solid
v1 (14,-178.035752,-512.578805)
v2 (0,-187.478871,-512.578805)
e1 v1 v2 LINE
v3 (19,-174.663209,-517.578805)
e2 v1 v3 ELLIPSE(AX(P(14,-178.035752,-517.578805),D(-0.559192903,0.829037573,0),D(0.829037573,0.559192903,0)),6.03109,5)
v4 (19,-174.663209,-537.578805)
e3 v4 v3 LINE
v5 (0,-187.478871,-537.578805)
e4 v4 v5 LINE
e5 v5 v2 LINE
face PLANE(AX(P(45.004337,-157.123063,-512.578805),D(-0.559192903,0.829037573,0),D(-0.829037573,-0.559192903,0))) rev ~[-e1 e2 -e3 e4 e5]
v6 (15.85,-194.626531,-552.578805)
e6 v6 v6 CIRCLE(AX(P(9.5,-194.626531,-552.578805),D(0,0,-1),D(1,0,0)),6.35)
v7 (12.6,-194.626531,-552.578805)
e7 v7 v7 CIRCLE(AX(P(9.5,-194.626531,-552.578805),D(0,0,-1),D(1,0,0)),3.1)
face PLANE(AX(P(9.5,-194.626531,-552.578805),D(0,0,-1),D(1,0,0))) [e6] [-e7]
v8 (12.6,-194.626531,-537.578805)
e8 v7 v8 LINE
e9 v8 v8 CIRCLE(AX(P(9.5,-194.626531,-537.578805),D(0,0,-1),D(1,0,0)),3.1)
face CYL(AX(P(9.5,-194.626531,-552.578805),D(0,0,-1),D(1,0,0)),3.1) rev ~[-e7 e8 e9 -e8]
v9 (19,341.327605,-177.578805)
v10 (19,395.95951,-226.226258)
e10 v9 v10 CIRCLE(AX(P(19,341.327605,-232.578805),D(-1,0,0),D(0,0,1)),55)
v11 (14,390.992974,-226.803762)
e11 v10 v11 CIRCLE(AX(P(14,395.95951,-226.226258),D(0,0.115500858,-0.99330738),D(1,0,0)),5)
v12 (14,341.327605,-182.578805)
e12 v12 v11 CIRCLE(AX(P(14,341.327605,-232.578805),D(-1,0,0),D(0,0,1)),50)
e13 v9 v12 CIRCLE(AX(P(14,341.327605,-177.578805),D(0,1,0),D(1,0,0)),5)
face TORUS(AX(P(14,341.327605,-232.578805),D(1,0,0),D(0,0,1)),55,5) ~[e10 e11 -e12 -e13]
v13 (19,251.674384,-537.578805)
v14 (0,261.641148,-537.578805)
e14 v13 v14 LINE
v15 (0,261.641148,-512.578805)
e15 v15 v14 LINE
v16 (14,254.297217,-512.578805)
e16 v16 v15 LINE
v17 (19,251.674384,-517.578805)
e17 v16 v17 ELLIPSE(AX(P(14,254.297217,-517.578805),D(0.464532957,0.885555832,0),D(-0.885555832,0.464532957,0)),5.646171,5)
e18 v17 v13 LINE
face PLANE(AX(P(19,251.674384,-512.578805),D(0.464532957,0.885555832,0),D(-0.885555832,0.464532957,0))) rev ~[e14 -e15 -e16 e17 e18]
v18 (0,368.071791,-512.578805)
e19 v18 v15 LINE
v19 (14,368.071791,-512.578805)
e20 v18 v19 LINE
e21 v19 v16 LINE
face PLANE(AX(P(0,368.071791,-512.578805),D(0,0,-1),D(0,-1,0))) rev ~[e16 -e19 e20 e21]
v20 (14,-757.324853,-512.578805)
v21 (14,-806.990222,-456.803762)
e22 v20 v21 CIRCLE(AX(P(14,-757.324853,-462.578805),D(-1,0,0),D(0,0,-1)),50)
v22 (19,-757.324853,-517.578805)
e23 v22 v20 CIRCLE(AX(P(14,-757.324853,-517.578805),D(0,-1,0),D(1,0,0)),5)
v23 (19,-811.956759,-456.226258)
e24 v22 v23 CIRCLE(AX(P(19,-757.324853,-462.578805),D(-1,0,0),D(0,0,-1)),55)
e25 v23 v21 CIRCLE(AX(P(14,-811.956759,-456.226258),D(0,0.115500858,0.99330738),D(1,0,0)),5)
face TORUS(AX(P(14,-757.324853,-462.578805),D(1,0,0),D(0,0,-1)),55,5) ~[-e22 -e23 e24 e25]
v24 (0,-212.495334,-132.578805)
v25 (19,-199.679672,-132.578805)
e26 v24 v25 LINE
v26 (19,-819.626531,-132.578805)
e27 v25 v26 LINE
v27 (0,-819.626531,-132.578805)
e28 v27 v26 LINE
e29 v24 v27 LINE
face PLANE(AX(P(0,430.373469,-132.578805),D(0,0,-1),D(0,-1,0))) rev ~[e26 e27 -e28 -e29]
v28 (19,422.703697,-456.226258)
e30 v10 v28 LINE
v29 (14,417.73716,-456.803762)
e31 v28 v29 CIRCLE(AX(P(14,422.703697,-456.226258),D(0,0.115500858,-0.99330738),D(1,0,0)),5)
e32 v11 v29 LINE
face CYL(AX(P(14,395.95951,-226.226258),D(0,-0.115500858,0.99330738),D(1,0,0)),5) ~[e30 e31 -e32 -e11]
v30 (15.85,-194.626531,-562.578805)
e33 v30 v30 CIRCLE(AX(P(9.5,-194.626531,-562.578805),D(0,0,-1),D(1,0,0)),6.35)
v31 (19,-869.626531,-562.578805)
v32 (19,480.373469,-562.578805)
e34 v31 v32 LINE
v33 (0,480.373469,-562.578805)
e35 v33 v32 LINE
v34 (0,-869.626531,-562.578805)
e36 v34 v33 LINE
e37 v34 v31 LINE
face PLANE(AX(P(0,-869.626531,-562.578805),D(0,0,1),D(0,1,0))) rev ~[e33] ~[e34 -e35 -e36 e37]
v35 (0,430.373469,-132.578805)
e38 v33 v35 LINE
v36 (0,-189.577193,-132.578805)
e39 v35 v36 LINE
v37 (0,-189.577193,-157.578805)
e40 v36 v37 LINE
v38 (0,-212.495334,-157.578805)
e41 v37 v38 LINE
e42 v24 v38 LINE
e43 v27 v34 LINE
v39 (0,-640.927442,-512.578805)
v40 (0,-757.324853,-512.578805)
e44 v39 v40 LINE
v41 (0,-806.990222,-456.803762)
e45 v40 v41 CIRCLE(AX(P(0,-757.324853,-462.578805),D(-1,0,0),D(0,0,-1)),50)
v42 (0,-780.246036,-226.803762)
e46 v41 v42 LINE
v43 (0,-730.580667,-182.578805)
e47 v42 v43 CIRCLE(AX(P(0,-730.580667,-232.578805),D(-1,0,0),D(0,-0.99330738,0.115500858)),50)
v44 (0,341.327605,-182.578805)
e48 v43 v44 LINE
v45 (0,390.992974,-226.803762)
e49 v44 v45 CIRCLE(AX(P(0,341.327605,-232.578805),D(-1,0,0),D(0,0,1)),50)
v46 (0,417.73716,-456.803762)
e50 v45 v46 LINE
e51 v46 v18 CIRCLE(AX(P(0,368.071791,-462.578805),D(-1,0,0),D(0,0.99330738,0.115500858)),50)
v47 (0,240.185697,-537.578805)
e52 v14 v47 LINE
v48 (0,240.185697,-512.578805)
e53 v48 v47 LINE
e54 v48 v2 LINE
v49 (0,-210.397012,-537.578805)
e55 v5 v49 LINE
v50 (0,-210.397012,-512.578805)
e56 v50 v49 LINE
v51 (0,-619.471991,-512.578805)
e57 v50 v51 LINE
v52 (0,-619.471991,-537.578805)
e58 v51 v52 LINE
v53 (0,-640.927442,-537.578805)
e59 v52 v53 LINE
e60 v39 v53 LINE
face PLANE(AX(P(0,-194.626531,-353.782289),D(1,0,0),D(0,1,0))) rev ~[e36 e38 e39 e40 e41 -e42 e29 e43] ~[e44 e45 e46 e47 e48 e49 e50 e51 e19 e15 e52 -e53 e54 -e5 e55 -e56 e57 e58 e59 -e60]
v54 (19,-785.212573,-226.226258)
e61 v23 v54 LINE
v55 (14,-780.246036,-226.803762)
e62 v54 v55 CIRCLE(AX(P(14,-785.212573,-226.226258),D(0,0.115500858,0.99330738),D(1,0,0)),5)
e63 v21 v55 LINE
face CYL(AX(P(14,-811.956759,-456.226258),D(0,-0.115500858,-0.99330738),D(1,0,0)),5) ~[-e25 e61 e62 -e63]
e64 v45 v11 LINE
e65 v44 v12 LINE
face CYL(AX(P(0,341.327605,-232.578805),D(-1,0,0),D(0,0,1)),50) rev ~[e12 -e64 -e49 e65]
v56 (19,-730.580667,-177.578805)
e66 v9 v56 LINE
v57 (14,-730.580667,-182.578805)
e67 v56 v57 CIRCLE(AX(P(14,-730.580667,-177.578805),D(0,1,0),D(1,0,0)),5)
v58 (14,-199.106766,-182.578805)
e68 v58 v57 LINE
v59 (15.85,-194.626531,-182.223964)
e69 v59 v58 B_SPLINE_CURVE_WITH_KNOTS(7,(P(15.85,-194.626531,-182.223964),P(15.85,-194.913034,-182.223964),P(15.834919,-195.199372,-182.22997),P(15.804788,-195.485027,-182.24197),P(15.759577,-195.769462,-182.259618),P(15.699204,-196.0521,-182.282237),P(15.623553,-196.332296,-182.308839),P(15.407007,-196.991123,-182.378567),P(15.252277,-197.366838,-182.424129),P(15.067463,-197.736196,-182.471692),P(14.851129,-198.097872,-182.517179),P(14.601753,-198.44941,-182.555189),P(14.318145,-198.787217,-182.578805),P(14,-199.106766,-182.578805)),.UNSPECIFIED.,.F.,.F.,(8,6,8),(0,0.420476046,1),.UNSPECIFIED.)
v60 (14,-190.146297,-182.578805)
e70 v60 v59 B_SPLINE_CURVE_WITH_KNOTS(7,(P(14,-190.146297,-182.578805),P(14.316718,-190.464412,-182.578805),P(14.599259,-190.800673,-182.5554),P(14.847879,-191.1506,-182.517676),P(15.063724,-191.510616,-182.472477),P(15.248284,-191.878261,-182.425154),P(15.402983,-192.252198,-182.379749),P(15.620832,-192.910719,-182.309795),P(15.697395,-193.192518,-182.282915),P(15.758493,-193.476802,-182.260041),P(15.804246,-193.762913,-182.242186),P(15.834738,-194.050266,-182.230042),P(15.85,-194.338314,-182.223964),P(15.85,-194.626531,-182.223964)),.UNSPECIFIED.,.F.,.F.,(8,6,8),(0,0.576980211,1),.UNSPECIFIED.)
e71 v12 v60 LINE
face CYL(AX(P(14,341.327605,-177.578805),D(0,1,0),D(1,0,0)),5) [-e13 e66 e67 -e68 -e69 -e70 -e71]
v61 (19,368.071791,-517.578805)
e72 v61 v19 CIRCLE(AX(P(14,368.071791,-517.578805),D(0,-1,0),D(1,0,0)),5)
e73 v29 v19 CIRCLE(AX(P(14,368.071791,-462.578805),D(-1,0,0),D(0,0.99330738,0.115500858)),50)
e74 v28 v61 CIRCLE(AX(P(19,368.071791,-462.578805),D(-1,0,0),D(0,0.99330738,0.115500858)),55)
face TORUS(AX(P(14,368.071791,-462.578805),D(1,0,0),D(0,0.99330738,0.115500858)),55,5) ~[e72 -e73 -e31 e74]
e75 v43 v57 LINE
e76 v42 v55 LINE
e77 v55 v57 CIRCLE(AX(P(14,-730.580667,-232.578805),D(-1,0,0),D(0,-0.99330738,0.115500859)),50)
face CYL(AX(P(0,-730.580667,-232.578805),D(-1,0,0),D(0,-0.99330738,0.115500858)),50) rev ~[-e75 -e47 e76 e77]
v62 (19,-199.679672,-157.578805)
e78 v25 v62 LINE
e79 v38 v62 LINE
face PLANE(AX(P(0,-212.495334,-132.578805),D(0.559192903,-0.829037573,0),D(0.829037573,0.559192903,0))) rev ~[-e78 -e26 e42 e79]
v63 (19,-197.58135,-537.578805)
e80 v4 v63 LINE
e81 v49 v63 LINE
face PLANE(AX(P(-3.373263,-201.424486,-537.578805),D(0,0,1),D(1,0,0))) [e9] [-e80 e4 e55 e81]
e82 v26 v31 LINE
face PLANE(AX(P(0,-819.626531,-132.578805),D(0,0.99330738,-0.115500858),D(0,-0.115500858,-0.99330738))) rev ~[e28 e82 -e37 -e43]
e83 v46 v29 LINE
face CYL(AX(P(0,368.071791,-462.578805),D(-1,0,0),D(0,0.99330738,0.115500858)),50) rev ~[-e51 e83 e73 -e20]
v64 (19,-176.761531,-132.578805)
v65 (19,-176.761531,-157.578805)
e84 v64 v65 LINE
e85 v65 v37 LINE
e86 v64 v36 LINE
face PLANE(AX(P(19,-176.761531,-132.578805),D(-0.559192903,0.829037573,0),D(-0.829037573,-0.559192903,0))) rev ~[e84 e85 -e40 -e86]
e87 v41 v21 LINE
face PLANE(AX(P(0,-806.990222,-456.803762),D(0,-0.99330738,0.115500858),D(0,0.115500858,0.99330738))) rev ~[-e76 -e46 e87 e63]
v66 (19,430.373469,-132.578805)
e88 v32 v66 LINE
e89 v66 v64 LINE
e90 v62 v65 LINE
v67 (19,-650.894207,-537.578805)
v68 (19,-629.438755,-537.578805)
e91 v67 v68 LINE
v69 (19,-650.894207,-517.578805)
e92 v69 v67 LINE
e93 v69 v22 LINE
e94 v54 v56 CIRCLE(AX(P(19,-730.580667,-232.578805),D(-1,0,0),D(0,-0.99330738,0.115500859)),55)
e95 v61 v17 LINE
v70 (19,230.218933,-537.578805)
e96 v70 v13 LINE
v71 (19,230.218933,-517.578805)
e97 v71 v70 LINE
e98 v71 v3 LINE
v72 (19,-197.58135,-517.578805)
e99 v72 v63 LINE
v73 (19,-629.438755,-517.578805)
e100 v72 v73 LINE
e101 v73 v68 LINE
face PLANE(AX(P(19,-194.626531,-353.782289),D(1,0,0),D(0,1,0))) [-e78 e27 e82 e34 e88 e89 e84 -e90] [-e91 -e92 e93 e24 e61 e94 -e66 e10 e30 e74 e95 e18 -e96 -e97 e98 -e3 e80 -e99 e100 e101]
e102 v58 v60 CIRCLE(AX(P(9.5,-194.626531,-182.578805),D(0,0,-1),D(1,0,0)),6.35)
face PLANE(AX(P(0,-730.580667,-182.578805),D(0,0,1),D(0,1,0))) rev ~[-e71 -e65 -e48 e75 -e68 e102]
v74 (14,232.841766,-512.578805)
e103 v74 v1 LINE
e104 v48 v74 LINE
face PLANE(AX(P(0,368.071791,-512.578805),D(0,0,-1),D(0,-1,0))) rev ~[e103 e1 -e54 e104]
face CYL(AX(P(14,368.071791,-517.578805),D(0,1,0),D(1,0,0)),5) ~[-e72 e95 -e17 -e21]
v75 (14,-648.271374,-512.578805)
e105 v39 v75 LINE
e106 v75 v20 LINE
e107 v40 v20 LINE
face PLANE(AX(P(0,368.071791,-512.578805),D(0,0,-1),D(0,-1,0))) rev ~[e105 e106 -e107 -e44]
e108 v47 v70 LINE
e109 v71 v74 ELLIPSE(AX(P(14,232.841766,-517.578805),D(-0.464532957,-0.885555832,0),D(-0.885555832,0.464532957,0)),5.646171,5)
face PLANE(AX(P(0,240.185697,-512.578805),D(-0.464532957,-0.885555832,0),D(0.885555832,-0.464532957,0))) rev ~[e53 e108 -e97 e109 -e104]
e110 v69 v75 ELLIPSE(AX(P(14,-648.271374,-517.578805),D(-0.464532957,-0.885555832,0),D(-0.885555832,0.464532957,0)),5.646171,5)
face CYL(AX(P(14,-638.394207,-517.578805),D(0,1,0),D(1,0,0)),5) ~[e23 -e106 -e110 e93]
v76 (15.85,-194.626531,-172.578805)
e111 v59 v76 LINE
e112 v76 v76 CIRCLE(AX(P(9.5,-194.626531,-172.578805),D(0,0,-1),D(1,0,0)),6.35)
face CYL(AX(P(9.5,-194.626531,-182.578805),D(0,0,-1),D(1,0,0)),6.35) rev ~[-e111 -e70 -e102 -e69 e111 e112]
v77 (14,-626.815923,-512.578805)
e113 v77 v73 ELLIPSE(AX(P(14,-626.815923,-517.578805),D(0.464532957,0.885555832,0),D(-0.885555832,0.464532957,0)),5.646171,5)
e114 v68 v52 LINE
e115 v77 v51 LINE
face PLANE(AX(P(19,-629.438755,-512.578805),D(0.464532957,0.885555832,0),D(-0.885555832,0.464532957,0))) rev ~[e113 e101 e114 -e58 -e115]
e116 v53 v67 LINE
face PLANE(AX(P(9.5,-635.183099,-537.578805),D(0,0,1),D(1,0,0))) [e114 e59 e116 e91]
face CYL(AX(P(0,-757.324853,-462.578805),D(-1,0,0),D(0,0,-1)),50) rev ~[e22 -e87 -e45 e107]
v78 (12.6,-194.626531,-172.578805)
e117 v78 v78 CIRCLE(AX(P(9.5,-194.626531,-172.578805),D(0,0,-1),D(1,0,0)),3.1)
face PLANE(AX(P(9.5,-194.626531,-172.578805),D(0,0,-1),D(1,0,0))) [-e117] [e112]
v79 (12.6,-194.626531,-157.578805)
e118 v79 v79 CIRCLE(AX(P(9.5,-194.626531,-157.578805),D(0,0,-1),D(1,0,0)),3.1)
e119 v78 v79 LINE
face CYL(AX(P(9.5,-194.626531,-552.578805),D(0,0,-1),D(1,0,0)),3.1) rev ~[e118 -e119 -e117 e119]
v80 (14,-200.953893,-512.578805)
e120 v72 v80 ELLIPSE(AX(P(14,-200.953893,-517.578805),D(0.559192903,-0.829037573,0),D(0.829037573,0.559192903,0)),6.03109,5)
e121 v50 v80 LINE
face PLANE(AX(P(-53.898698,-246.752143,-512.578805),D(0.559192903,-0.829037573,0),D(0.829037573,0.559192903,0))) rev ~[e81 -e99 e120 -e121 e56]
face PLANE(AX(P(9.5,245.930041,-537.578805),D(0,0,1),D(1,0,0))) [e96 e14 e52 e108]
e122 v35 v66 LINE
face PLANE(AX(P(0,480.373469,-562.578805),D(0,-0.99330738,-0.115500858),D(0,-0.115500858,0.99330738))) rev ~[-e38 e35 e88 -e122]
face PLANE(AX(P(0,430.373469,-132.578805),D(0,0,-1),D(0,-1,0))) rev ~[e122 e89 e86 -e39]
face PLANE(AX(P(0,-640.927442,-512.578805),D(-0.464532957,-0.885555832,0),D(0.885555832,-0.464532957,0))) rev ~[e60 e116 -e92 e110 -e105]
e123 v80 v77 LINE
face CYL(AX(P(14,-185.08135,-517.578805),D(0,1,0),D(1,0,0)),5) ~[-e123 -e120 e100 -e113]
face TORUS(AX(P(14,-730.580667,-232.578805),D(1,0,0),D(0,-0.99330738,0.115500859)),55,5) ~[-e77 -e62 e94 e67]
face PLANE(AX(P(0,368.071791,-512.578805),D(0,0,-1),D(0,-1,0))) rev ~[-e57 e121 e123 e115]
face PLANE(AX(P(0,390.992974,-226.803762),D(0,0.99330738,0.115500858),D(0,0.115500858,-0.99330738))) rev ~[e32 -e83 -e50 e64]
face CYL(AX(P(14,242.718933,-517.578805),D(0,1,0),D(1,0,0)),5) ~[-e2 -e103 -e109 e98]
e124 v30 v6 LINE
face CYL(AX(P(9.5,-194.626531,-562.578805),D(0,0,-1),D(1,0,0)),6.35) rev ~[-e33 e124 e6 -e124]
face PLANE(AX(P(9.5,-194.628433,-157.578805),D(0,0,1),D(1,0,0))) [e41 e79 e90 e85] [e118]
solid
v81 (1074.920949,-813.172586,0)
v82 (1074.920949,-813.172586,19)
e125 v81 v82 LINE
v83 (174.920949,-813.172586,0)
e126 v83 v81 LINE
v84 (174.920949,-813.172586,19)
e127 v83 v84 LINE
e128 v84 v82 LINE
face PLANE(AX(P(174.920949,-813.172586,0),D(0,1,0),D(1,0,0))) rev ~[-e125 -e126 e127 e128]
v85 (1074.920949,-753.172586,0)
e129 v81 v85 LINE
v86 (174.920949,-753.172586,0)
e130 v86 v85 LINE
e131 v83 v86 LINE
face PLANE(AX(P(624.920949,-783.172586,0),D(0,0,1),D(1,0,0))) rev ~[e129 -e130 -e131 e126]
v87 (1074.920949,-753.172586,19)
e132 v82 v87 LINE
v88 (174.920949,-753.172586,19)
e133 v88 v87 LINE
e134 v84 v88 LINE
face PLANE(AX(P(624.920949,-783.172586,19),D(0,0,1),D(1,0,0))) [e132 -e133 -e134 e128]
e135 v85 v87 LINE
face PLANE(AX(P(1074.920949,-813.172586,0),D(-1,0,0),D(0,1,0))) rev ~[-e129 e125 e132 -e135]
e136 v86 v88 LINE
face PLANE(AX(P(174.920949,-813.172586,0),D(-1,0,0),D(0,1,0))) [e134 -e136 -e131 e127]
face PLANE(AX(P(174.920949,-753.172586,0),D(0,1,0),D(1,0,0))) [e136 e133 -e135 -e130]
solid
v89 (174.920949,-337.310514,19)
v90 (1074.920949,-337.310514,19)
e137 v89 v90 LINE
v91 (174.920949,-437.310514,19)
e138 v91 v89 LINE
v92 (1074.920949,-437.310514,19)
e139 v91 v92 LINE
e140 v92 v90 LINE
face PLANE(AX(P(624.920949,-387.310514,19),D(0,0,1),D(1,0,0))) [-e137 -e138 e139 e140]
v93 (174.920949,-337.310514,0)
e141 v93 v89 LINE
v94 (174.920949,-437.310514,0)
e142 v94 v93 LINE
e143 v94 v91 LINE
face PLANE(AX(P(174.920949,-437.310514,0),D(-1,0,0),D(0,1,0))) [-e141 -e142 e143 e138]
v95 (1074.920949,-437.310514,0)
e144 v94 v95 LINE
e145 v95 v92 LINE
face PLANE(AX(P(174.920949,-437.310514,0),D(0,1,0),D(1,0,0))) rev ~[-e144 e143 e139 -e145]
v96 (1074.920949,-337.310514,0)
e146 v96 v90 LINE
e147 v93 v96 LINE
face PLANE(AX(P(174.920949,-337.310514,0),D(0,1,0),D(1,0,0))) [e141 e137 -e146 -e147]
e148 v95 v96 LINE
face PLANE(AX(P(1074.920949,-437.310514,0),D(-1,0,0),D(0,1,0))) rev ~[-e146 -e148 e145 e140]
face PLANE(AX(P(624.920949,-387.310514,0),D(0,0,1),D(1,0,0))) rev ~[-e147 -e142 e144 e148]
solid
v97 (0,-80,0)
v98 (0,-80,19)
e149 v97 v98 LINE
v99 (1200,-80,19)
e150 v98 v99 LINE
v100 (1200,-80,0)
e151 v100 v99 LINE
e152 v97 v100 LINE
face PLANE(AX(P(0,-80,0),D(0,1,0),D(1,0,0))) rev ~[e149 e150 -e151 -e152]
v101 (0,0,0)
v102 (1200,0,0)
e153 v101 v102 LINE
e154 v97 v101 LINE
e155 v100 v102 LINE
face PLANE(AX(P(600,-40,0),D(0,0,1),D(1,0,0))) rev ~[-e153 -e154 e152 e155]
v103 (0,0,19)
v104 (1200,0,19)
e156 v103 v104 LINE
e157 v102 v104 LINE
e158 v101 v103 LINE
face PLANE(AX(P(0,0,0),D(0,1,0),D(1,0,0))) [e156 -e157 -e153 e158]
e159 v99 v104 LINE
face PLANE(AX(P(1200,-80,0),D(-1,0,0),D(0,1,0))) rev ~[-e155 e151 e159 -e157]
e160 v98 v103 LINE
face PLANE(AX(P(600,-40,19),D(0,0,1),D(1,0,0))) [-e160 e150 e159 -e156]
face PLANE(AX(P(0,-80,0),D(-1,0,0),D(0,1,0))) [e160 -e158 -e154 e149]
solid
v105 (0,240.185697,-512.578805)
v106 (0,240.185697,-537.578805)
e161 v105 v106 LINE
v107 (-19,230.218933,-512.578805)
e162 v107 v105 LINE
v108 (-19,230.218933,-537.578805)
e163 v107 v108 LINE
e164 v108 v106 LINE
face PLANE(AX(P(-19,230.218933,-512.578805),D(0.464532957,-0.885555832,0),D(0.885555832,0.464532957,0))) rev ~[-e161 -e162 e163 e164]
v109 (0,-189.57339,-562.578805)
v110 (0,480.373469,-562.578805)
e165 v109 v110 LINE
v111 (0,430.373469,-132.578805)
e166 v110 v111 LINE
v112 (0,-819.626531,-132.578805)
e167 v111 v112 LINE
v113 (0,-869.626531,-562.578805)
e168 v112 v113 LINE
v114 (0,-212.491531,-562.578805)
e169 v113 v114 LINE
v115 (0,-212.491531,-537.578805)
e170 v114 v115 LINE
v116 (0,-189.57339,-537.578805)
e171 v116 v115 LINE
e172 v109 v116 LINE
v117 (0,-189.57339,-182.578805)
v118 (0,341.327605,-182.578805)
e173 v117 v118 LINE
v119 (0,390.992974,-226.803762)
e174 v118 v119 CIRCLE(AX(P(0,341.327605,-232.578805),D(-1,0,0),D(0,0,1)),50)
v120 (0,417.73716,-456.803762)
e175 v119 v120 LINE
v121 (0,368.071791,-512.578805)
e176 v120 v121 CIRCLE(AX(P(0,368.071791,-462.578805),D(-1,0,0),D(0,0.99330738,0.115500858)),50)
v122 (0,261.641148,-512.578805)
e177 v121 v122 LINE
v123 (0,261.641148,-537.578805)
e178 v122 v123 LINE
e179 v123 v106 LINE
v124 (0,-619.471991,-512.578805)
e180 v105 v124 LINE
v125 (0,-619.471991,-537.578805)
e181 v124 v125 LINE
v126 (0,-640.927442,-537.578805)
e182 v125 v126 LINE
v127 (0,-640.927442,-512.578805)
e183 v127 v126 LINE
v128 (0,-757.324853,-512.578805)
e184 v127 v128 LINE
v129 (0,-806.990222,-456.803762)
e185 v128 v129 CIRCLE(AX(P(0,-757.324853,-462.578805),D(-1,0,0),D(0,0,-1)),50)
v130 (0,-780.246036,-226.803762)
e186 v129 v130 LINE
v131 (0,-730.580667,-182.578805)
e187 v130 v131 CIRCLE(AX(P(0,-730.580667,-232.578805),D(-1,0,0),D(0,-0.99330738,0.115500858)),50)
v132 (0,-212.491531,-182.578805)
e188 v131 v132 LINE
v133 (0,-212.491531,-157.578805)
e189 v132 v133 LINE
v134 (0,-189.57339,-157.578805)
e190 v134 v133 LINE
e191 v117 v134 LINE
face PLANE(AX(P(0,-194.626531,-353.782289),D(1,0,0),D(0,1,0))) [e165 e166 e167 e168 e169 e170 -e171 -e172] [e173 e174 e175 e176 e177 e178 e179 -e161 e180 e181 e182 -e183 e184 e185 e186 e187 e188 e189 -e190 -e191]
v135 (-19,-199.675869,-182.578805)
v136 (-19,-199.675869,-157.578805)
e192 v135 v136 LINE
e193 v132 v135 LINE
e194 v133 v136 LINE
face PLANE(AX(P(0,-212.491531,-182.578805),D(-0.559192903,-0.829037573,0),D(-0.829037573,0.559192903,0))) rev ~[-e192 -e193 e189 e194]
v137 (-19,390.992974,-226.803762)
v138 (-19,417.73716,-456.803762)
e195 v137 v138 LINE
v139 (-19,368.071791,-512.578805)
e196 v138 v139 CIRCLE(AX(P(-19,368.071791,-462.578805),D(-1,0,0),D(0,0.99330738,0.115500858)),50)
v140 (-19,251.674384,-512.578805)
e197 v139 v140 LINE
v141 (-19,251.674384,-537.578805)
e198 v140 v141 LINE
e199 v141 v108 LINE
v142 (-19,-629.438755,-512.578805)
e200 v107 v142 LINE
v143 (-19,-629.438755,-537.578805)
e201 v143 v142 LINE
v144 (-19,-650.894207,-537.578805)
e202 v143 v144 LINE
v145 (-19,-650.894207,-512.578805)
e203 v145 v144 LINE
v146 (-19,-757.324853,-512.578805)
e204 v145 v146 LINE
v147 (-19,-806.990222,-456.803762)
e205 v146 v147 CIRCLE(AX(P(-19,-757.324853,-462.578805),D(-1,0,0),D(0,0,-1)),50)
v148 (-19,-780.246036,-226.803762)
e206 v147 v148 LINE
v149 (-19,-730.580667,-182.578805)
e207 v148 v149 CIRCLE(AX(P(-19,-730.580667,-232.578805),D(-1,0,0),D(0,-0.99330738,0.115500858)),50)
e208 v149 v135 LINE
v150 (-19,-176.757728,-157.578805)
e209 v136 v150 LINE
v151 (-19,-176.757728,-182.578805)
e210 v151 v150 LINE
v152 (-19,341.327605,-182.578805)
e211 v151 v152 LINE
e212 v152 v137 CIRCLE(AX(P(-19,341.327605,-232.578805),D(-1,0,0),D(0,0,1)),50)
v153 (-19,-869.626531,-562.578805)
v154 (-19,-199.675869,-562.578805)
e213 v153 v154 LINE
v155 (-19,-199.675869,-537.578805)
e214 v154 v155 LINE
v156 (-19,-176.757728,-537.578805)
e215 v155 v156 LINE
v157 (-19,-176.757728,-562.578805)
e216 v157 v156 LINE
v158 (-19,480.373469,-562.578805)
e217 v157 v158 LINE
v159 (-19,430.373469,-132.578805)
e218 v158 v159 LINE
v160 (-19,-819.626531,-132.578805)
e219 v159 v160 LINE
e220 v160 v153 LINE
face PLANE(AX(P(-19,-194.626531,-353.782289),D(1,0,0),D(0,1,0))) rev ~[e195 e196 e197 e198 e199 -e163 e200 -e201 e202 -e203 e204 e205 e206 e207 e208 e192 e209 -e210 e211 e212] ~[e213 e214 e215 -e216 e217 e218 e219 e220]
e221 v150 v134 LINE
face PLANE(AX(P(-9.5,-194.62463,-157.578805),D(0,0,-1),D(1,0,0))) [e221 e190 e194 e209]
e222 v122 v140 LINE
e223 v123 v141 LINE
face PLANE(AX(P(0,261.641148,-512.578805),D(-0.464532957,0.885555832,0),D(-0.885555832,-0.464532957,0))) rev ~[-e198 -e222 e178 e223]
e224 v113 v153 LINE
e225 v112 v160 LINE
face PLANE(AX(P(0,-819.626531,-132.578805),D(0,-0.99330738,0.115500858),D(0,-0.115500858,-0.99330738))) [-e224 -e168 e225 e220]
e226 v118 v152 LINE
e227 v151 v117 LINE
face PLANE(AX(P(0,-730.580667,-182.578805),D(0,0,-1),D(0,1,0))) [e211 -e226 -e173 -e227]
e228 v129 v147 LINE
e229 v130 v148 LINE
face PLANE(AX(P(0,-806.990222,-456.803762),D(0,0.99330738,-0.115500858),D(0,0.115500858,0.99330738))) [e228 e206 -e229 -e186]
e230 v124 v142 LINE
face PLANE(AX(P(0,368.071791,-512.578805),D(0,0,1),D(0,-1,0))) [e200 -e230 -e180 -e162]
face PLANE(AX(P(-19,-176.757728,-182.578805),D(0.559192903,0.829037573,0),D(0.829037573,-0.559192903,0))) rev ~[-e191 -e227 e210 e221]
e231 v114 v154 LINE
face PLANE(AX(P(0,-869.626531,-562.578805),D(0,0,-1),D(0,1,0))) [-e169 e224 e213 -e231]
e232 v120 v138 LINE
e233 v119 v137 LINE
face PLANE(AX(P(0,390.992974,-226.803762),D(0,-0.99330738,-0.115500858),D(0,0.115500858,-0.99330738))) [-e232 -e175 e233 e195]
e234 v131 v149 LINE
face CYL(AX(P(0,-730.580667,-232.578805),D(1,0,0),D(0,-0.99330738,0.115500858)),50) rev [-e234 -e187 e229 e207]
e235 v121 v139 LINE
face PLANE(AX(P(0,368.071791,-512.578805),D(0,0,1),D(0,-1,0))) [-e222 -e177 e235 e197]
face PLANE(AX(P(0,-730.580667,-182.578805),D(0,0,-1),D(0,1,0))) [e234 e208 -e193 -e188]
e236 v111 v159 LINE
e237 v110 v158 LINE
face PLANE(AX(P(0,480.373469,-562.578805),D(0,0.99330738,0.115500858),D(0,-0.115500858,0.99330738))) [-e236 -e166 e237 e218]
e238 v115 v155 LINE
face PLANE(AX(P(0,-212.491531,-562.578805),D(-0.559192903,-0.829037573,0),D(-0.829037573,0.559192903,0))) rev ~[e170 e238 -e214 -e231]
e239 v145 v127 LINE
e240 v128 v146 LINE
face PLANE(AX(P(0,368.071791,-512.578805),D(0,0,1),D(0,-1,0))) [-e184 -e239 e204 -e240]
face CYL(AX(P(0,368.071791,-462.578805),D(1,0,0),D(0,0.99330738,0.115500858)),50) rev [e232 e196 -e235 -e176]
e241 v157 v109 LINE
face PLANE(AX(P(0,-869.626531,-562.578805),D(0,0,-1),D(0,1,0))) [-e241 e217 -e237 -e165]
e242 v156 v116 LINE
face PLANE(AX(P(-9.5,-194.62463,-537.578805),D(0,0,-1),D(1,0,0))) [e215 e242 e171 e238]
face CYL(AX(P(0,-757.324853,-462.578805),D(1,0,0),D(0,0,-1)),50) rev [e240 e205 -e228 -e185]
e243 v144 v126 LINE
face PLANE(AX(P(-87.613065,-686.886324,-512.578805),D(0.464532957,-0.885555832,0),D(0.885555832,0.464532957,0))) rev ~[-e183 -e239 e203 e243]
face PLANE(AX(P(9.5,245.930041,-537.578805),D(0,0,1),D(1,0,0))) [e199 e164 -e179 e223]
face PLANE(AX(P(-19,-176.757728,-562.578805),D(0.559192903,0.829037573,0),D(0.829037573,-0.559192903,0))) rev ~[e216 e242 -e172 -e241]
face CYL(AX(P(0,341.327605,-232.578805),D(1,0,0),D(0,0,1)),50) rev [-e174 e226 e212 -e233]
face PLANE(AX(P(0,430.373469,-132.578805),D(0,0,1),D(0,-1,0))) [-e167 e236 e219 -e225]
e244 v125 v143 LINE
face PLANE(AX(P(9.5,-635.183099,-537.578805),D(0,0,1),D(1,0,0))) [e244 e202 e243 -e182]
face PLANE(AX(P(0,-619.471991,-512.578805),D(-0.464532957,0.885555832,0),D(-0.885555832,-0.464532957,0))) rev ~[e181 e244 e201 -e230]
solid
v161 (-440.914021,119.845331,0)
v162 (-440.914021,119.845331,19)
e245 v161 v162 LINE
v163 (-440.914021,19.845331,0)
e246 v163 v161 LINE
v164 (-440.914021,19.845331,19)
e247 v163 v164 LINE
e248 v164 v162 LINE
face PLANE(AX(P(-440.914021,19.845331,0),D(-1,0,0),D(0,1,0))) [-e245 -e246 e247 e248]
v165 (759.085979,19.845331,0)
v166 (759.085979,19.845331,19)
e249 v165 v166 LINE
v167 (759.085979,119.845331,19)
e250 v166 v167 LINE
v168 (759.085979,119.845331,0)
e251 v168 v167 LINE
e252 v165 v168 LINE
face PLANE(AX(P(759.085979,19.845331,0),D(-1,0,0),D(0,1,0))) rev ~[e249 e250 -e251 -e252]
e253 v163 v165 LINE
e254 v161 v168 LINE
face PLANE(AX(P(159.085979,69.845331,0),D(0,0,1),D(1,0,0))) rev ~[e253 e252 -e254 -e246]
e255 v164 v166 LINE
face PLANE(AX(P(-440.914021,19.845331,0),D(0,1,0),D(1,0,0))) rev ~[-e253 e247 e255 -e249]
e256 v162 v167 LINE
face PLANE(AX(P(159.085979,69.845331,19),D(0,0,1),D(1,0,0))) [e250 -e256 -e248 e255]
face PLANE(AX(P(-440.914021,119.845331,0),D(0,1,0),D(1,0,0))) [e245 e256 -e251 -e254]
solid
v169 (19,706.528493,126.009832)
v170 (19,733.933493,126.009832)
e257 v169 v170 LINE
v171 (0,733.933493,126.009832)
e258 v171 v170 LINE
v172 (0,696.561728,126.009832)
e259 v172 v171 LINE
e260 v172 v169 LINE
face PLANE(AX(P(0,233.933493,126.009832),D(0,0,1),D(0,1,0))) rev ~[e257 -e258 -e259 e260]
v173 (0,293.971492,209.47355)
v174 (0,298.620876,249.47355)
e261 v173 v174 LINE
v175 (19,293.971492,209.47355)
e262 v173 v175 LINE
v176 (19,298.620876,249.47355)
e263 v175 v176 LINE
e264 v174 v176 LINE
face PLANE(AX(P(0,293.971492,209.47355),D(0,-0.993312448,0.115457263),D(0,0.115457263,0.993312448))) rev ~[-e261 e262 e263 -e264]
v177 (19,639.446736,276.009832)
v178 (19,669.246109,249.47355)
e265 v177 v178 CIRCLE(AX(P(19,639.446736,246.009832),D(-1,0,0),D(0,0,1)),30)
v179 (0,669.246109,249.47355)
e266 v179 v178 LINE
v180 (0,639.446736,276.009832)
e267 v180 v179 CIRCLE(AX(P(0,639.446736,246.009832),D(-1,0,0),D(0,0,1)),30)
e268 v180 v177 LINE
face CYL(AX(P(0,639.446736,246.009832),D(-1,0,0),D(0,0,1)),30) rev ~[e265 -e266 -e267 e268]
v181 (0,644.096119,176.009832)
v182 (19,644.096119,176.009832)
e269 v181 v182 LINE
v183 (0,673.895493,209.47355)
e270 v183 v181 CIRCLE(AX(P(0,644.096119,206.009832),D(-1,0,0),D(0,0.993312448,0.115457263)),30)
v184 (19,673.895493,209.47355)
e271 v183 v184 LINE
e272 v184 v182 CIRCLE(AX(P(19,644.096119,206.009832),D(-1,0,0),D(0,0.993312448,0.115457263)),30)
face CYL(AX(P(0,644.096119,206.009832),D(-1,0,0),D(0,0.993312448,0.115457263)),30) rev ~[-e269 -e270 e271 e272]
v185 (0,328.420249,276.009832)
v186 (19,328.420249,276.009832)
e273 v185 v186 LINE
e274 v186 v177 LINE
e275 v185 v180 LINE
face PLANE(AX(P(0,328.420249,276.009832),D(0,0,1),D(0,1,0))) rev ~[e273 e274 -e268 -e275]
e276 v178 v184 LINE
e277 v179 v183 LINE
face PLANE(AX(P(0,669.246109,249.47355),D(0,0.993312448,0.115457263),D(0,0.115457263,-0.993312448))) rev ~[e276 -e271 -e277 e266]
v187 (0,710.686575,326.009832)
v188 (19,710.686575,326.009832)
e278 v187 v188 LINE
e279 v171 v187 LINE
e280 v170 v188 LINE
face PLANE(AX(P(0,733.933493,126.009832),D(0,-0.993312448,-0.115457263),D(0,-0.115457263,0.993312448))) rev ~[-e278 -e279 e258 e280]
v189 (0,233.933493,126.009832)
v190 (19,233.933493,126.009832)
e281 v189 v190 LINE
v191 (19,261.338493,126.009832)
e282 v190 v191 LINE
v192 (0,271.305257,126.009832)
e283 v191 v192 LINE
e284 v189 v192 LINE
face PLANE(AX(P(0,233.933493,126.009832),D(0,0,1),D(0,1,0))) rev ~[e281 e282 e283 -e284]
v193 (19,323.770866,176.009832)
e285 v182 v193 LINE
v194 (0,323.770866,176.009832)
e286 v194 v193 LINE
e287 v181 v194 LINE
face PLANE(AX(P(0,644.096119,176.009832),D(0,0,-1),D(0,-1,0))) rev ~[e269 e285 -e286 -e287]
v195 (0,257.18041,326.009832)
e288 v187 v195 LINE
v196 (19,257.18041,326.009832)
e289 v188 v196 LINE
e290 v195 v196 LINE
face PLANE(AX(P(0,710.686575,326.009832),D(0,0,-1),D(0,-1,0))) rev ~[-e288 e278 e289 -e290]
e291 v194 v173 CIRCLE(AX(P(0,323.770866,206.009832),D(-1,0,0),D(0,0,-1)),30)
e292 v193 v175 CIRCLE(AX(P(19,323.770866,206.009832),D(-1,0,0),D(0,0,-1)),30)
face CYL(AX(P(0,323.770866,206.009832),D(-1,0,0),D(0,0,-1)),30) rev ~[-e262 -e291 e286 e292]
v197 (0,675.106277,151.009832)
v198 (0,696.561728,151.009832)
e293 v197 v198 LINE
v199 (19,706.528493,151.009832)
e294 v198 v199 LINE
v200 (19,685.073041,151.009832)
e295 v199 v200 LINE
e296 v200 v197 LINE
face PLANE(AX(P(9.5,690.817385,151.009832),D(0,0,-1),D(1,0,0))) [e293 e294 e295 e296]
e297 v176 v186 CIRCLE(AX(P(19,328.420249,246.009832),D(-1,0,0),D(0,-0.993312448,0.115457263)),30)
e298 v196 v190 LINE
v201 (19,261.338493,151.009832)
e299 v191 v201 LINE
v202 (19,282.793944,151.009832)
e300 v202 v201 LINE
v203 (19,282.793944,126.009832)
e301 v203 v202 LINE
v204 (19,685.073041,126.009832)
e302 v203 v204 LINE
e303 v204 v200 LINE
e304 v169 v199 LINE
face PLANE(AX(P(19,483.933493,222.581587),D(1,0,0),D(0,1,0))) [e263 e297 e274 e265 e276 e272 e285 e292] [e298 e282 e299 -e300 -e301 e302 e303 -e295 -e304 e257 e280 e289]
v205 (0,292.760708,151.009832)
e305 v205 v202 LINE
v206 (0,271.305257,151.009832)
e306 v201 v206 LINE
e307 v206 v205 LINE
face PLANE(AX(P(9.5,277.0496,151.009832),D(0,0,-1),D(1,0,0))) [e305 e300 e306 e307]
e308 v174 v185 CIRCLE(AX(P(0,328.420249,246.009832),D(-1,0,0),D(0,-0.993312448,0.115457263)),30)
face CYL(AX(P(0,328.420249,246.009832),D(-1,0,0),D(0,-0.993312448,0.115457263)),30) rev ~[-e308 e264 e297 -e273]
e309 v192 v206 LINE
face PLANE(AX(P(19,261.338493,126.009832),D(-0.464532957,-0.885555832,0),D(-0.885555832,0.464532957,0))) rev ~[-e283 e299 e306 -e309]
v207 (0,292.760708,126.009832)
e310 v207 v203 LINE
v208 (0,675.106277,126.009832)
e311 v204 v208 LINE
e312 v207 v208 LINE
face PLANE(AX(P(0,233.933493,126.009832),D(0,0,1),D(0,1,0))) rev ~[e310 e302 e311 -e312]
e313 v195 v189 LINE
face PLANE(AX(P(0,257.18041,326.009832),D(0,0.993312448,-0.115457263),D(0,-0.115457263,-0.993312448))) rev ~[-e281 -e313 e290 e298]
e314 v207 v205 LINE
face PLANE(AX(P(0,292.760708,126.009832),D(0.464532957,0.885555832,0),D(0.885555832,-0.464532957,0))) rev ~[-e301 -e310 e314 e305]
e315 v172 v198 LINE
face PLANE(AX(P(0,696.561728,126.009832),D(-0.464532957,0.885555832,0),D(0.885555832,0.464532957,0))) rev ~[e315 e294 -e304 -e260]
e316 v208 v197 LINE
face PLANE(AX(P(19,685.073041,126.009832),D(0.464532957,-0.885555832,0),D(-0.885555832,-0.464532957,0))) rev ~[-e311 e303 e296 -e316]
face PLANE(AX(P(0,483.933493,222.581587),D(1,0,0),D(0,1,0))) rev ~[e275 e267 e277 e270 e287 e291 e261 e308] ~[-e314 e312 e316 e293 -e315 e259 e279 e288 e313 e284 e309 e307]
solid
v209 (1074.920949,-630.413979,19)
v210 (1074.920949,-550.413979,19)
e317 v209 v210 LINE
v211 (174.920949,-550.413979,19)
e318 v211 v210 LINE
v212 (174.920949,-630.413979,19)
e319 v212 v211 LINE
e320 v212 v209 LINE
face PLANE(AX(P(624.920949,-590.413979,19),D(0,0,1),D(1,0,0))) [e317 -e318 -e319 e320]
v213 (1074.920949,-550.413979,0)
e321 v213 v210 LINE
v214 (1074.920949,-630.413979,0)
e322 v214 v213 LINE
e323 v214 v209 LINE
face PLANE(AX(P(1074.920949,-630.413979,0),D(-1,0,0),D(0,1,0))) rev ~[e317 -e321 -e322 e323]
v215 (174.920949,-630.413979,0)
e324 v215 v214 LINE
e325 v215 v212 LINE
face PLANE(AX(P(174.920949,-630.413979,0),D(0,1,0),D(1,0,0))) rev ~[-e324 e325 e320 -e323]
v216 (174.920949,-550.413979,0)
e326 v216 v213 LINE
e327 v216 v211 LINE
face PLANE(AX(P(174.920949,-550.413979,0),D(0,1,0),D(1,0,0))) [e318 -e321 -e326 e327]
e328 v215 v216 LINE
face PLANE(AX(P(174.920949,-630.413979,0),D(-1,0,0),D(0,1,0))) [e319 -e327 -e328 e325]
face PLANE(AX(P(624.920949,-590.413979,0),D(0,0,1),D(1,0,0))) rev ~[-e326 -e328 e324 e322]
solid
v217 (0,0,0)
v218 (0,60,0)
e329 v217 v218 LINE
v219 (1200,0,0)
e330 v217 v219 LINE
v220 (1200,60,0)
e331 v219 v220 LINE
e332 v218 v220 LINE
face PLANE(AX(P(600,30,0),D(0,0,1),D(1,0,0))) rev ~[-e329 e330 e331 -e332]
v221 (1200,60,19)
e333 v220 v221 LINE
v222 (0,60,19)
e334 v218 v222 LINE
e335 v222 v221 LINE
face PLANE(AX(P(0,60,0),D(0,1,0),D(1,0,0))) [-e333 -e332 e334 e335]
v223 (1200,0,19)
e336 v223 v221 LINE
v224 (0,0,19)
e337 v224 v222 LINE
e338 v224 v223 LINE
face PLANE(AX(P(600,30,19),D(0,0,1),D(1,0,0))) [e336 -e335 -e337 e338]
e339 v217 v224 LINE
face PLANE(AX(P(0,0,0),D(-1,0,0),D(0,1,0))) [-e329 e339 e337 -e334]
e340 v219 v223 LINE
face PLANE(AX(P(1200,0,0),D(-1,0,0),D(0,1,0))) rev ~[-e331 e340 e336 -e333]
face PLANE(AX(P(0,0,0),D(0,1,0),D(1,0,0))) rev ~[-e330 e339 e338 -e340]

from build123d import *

# Parameters (mm, degrees)
F0_W          = 1200
F0_H          = 60
F1_DEPTH      = 19
F2_W          = 1200
F2_H          = 80
F3_DEPTH      = 19
F4_W          = 1200
F4_H          = 100
F5_DEPTH      = 19
F7_DEPTH      = 19
F8_DEPTH      = 19
F10_DEPTH     = 25
F12_DEPTH     = 25
F14_DEPTH     = 25
F16_DEPTH     = 25
F18_R         = 6.35
F19_DEPTH     = 10
F20_R         = 3.1
F21_DEPTH     = 571.5798048431
F22_R         = 6.35
F22_R_2       = 3.1
F23_DEPTH     = 10
F24_R         = 6.35
F25_DEPTH     = 10
F27_DEPTH     = 25
F28_DEPTH     = 25
F30_DEPTH     = 19
F32_DEPTH     = 25
F33_W         = 900
F33_H         = 60
F34_DEPTH     = 19
F33_H_2       = 80
F35_DEPTH     = 19
F33_H_3       = 100
F36_DEPTH     = 19
F37_T1_DEPTH  = 456.85740495
F37_T3_DEPTH  = 429.8821422275
F37_T5_DEPTH  = 128.89740651
F37_T7_DEPTH  = 118.9306462831
F37_T9_DEPTH  = 231.5496739088
F37_T11_DEPTH = 1071.9082714241
F37_T13_DEPTH = 231.5496739088
F37_T16_ANGLE = 96.6325146151
F37_T18_ANGLE = 83.3674853849
F37_T20_ANGLE = 83.3674853849
F37_T22_ANGLE = 96.6325146151


# Not quite as in the source:
# - a fillet or chamfer that OpenCascade refuses, or shapes differently, is made with other operations: its cross-section is extruded or revolved along the edge and cut away or added
# - a feature names something its author has since deleted; it is built from what else it names


with BuildPart() as f1:
    # F0 (on Top) → F1 (new body)
    with BuildSketch(Plane.XY):
        with Locations((600, 30)):
            Rectangle(F0_W, F0_H)
    extrude(amount=F1_DEPTH)

    # F24 (on face) → F25 (cut)
    with BuildSketch(Plane(origin=(0, 0, -182.5788048431), x_dir=(1, 0, 0), z_dir=(0, 0, -1))):
        with Locations((9.5, 194.6265311424)):
            Circle(F24_R)
    extrude(amount=-F25_DEPTH, mode=Mode.SUBTRACT)


with BuildPart() as f3:
    # F2 (on Top) → F3 (new body)
    with BuildSketch(Plane.XY):
        with Locations((600, -40)):
            Rectangle(F2_W, F2_H)
    extrude(amount=F3_DEPTH)


with BuildPart() as f5:
    # F4 (on Top) → F5 (new body)
    with BuildSketch(Plane.XY):
        with Locations((159.0859787539, 69.8453307072)):
            Rectangle(F4_W, F4_H)
    extrude(amount=F5_DEPTH)


with BuildPart() as f7:
    # F6 (on Right) → F7 (new body)
    with BuildSketch(Plane.YZ):
        Polygon((430.3734688576, -132.5788048431), (-819.6265311424, -132.5788048431), (-869.6265311424, -562.5788048431), (480.3734688576, -562.5788048431), align=None)
        with BuildLine():
            ThreePointArc((-780.2460358695, -226.8037619344), (-763.8315905601, -195.2374594909), (-730.5806668544, -182.5788048431))
            Line((-730.5806668544, -182.5788048431), (341.3276045696, -182.5788048431))
            ThreePointArc((341.3276045696, -182.5788048431), (374.5785282753, -195.2374594909), (390.9929735847, -226.8037619344))
            Line((390.9929735847, -226.8037619344), (417.7371596312, -456.8037619344))
            ThreePointArc((417.7371596312, -456.8037619344), (405.4131359684, -495.8297285488), (368.0717906162, -512.5788048431))
            Line((368.0717906162, -512.5788048431), (-757.3248529009, -512.5788048431))
            ThreePointArc((-757.3248529009, -512.5788048431), (-794.6661982532, -495.8297285488), (-806.990221916, -456.8037619344))
            Line((-806.990221916, -456.8037619344), (-780.2460358695, -226.8037619344))
        make_face(mode=Mode.SUBTRACT)
    extrude(amount=F7_DEPTH)

    # F9 (on face) → F10 (cut)
    with BuildSketch(Plane.XY.offset(-132.5788048431)):
        Polygon((19, -176.7615311424), (0, -189.5771929624), (0, -212.495333984), (19, -199.679672164), align=None)
    extrude(amount=-F10_DEPTH, mode=Mode.SUBTRACT)

    # F11 (on face) → F12 (cut)
    with BuildSketch(Plane.XY.offset(-512.5788048431)):
        Polygon((45.0043368484, -157.1230627047), (-59.9762402534, -227.9333560629), (-53.8986982225, -246.7521432232), (55.6290020144, -172.8747765833), align=None)
    extrude(amount=-F12_DEPTH, mode=Mode.SUBTRACT)

    # F18 (on face) → F19 (cut)
    with BuildSketch(Plane(origin=(0, 0, -562.5788048431), x_dir=(1, 0, 0), z_dir=(0, 0, -1))):
        with Locations((9.5, 194.6265311424)):
            Circle(F18_R)
    extrude(amount=-F19_DEPTH, mode=Mode.SUBTRACT)

    # F20 (on face) → F21 (cut, through all)
    with BuildSketch(Plane(origin=(0, 0, -552.5788048431), x_dir=(1, 0, 0), z_dir=(0, 0, -1))):
        with Locations((9.5, 194.6265311424)):
            Circle(F20_R)
    extrude(amount=-F21_DEPTH, mode=Mode.SUBTRACT)

    # F22 (on face) → F23 (cut)
    with BuildSketch(Plane(origin=(0, 0, -182.5788048431), x_dir=(1, 0, 0), z_dir=(0, 0, -1))):
        with Locations((9.5, 194.6265311424)):
            Circle(F22_R)
        with Locations((9.5, 194.6265311424)):
            Circle(F22_R_2, mode=Mode.SUBTRACT)
    extrude(amount=-F23_DEPTH, mode=Mode.SUBTRACT)


with BuildPart() as f8:
    # F6 (on Right) → F8 (new body)
    with BuildSketch(Plane.YZ):
        Polygon((430.3734688576, -132.5788048431), (-819.6265311424, -132.5788048431), (-869.6265311424, -562.5788048431), (480.3734688576, -562.5788048431), align=None)
        with BuildLine():
            ThreePointArc((-780.2460358695, -226.8037619344), (-763.8315905601, -195.2374594909), (-730.5806668544, -182.5788048431))
            Line((-730.5806668544, -182.5788048431), (341.3276045696, -182.5788048431))
            ThreePointArc((341.3276045696, -182.5788048431), (374.5785282753, -195.2374594909), (390.9929735847, -226.8037619344))
            Line((390.9929735847, -226.8037619344), (417.7371596312, -456.8037619344))
            ThreePointArc((417.7371596312, -456.8037619344), (405.4131359684, -495.8297285488), (368.0717906162, -512.5788048431))
            Line((368.0717906162, -512.5788048431), (-757.3248529009, -512.5788048431))
            ThreePointArc((-757.3248529009, -512.5788048431), (-794.6661982532, -495.8297285488), (-806.990221916, -456.8037619344))
            Line((-806.990221916, -456.8037619344), (-780.2460358695, -226.8037619344))
        make_face(mode=Mode.SUBTRACT)
    extrude(amount=-F8_DEPTH)

    # F13 (on face) → F14 (cut)
    with BuildSketch(Plane(origin=(0, 0, -562.5788048431), x_dir=(1, 0, 0), z_dir=(0, 0, -1))):
        Polygon((0, 212.4915311424), (-19, 199.6758693224), (-19, 176.7577283008), (0, 189.5733901208), align=None)
    extrude(amount=-F14_DEPTH, mode=Mode.SUBTRACT)

    # F15 (on face) → F16 (cut)
    with BuildSketch(Plane(origin=(0, 0, -182.5788048431), x_dir=(1, 0, 0), z_dir=(0, 0, -1))):
        Polygon((0, 212.4915311424), (-19, 199.6758693224), (-19, 176.7577283008), (0, 189.5733901208), align=None)
    extrude(amount=-F16_DEPTH, mode=Mode.SUBTRACT)


with BuildPart() as f27_tool:
    # F26 (on face) → F27 (new body)
    with BuildSketch(Plane.XY.offset(-512.5788048431)):
        Polygon((0, -619.4719911424), (0, -640.9274424049), (19, -650.8942066179), (19, -629.4387553554), align=None)
        Polygon((-87.6130647374, -686.8863244162), (0, -640.9274424049), (0, -619.4719911424), (-87.6130647374, -665.4308731537), align=None)
        Polygon((0, 261.6411483192), (0, 240.1856970567), (19, 230.2189328437), (19, 251.6743841062), align=None)
    extrude(amount=-F27_DEPTH)


with BuildPart() as f7_1:
    add(f7.part)

    # F27: cut by f27_tool
    add(f27_tool.part, mode=Mode.SUBTRACT)

    # F37: fillet of radius 5 on 11 edges, made by hand

    # F37_s2 → F37_t1 (cut)
    with BuildSketch(Plane.XZ.offset(185.0813504054)):
        with BuildLine():
            ThreePointArc((19, -517.5788048431), (17.5355339059, -514.0432709372), (14, -512.5788048431))
            Line((14, -512.5788048431), (19, -512.5788048431))
            Line((19, -512.5788048431), (19, -517.5788048431))
        make_face()
    extrude(amount=F37_T1_DEPTH, mode=Mode.SUBTRACT)

    # F37_s4 → F37_t3 (cut)
    with BuildSketch(Plane.XZ.offset(-242.7189328437)):
        with BuildLine():
            ThreePointArc((19, -517.5788048431), (17.5355339059, -514.0432709372), (14, -512.5788048431))
            Line((14, -512.5788048431), (19, -512.5788048431))
            Line((19, -512.5788048431), (19, -517.5788048431))
        make_face()
    extrude(amount=F37_T3_DEPTH, mode=Mode.SUBTRACT)

    # F37_s6 → F37_t5 (cut)
    with BuildSketch(Plane.XZ.offset(-368.0717906162)):
        with BuildLine():
            ThreePointArc((19, -517.5788048431), (17.5355339059, -514.0432709372), (14, -512.5788048431))
            Line((14, -512.5788048431), (19, -512.5788048431))
            Line((19, -512.5788048431), (19, -517.5788048431))
        make_face()
    extrude(amount=F37_T5_DEPTH, mode=Mode.SUBTRACT)

    # F37_s8 → F37_t7 (cut)
    with BuildSketch(Plane.XZ.offset(638.3942066179)):
        with BuildLine():
            ThreePointArc((19, -517.5788048431), (17.5355339059, -514.0432709372), (14, -512.5788048431))
            Line((14, -512.5788048431), (19, -512.5788048431))
            Line((19, -512.5788048431), (19, -517.5788048431))
        make_face()
    extrude(amount=F37_T7_DEPTH, mode=Mode.SUBTRACT)

    # F37_s10 → F37_t9 (cut)
    with BuildSketch(Plane(origin=(0, 31.2367306059, -268.635883211), x_dir=(1, 0, 0), z_dir=(0, 0.1155008582, -0.9933073803))):
        with BuildLine():
            ThreePointArc((19, -367.180177167), (17.5355339059, -363.644643261), (14, -362.180177167))
            Line((14, -362.180177167), (19, -362.180177167))
            Line((19, -362.180177167), (19, -367.180177167))
        make_face()
    extrude(amount=F37_T9_DEPTH, mode=Mode.SUBTRACT)

    # F37_s12 → F37_t11 (cut)
    with BuildSketch(Plane.XZ.offset(-341.3276045696)):
        with BuildLine():
            ThreePointArc((19, -177.5788048431), (17.5355339059, -181.1143387491), (14, -182.5788048431))
            Line((14, -182.5788048431), (19, -182.5788048431))
            Line((19, -182.5788048431), (19, -177.5788048431))
        make_face()
    extrude(amount=F37_T11_DEPTH, mode=Mode.SUBTRACT)

    # F37_s14 → F37_t13 (cut)
    with BuildSketch(Plane(origin=(0, -63.1737269817, -543.294052043), x_dir=(1, 0, 0), z_dir=(0, 0.1155008582, 0.9933073803))):
        with BuildLine():
            ThreePointArc((19, -753.8281167393), (17.5355339059, -750.2925828334), (14, -748.8281167393))
            Line((14, -748.8281167393), (19, -748.8281167393))
            Line((19, -748.8281167393), (19, -753.8281167393))
        make_face()
    extrude(amount=F37_T13_DEPTH, mode=Mode.SUBTRACT)

    # F37_s15 → F37_t16 (revolve, cut)
    with BuildSketch(Plane(origin=(0, 57.9809166524, -498.635883211), x_dir=(1, 0, 0), z_dir=(0, -0.1155008582, 0.9933073803))):
        with BuildLine():
            ThreePointArc((19, 367.180177167), (17.5355339059, 363.644643261), (14, 362.180177167))
            Line((14, 362.180177167), (19, 362.180177167))
            Line((19, 362.180177167), (19, 367.180177167))
        make_face()
    revolve(axis=Axis((19, 368.0717906162, -462.5788048431), (-1, 0, 0)), revolution_arc=F37_T16_ANGLE, mode=Mode.SUBTRACT)

    # F37_s17 → F37_t18 (revolve, cut)
    with BuildSketch(Plane.XZ.offset(-341.3276045696)):
        with BuildLine():
            ThreePointArc((19, -177.5788048431), (17.5355339059, -181.1143387491), (14, -182.5788048431))
            Line((14, -182.5788048431), (19, -182.5788048431))
            Line((19, -182.5788048431), (19, -177.5788048431))
        make_face()
    revolve(axis=Axis((19, 341.3276045696, -232.5788048431), (-1, 0, 0)), revolution_arc=F37_T18_ANGLE, mode=Mode.SUBTRACT)

    # F37_s19 → F37_t20 (revolve, cut)
    with BuildSketch(Plane(origin=(0, -36.4295409352, -313.294052043), x_dir=(1, 0, 0), z_dir=(0, -0.1155008582, -0.9933073803))):
        with BuildLine():
            ThreePointArc((19, 753.8281167393), (17.5355339059, 750.2925828334), (14, 748.8281167393))
            Line((14, 748.8281167393), (19, 748.8281167393))
            Line((19, 748.8281167393), (19, 753.8281167393))
        make_face()
    revolve(axis=Axis((19, -730.5806668544, -232.5788048431), (-1, 0, 0)), revolution_arc=F37_T20_ANGLE, mode=Mode.SUBTRACT)

    # F37_s21 → F37_t22 (revolve, cut)
    with BuildSketch(Plane.XZ.offset(757.3248529009)):
        with BuildLine():
            ThreePointArc((19, -517.5788048431), (17.5355339059, -514.0432709372), (14, -512.5788048431))
            Line((14, -512.5788048431), (19, -512.5788048431))
            Line((19, -512.5788048431), (19, -517.5788048431))
        make_face()
    revolve(axis=Axis((19, -757.3248529009, -462.5788048431), (-1, 0, 0)), revolution_arc=F37_T22_ANGLE, mode=Mode.SUBTRACT)


with BuildPart() as f8_1:
    add(f8.part)

    # F27: cut by f27_tool
    add(f27_tool.part, mode=Mode.SUBTRACT)

    # F26 (on face) → F28 (cut)
    with BuildSketch(Plane.XY.offset(-512.5788048431)):
        Polygon((0, -619.4719911424), (0, -640.9274424049), (87.6130647374, -686.8863244162), (87.6130647374, -665.4308731537), align=None)
        Polygon((-87.6130647374, -686.8863244162), (0, -640.9274424049), (0, -619.4719911424), (-87.6130647374, -665.4308731537), align=None)
        Polygon((0, 261.6411483192), (0, 240.1856970567), (19, 230.2189328437), (19, 251.6743841062), align=None)
        Polygon((-19, 230.2189328437), (0, 240.1856970567), (0, 261.6411483192), (-19, 251.6743841062), align=None)
    extrude(amount=-F28_DEPTH, mode=Mode.SUBTRACT)


with BuildPart() as f30:
    # F29 (on Right) → F30 (new body)
    with BuildSketch(Plane.YZ):
        Polygon((257.1804102281, 326.0098321468), (233.9334925731, 126.0098321468), (733.9334925731, 126.0098321468), (710.6865749182, 326.0098321468), align=None)
        with BuildLine():
            Line((328.4202492434, 276.0098321468), (639.4467359028, 276.0098321468))
            ThreePointArc((639.4467359028, 276.0098321468), (659.3977817761, 268.4142015546), (669.2461093573, 249.4735500511))
            Line((669.2461093573, 249.4735500511), (673.8954928883, 209.4735500511))
            ThreePointArc((673.8954928883, 209.4735500511), (666.5004888417, 186.0587862735), (644.0961194338, 176.0098321468))
            Line((644.0961194338, 176.0098321468), (323.7708657124, 176.0098321468))
            ThreePointArc((323.7708657124, 176.0098321468), (301.3664963045, 186.0587862735), (293.9714922579, 209.4735500511))
            Line((293.9714922579, 209.4735500511), (298.6208757889, 249.4735500511))
            ThreePointArc((298.6208757889, 249.4735500511), (308.4692033701, 268.4142015546), (328.4202492434, 276.0098321468))
        make_face(mode=Mode.SUBTRACT)
    extrude(amount=F30_DEPTH)

    # F31 (on face) → F32 (cut)
    with BuildSketch(Plane(origin=(0, 0, 126.0098321468), x_dir=(1, 0, 0), z_dir=(0, 0, -1))):
        Polygon((19, -282.7939438356), (19, -261.3384925731), (0, -271.3052567861), (0, -292.7607080486), align=None)
        Polygon((19, -706.5284925731), (19, -685.0730413106), (0, -675.1062770976), (0, -696.5617283601), align=None)
    extrude(amount=-F32_DEPTH, mode=Mode.SUBTRACT)


with BuildPart() as f34:
    # F33 (on Top) → F34 (new body)
    with BuildSketch(Plane.XY):
        with Locations((624.9209493399, -783.1725859803)):
            Rectangle(F33_W, F33_H)
    extrude(amount=F34_DEPTH)


with BuildPart() as f35:
    # F33 (on Top) → F35 (new body)
    with BuildSketch(Plane.XY):
        with Locations((624.9209493399, -590.4139791311)):
            Rectangle(F33_W, F33_H_2)
    extrude(amount=F35_DEPTH)


with BuildPart() as f36:
    # F33 (on Top) → F36 (new body)
    with BuildSketch(Plane.XY):
        with Locations((624.9209493399, -387.3105144983)):
            Rectangle(F33_W, F33_H_3)
    extrude(amount=F36_DEPTH)


solid = Compound([f1.part, f3.part, f5.part, f7_1.part, f8_1.part, f30.part, f34.part, f35.part, f36.part])
